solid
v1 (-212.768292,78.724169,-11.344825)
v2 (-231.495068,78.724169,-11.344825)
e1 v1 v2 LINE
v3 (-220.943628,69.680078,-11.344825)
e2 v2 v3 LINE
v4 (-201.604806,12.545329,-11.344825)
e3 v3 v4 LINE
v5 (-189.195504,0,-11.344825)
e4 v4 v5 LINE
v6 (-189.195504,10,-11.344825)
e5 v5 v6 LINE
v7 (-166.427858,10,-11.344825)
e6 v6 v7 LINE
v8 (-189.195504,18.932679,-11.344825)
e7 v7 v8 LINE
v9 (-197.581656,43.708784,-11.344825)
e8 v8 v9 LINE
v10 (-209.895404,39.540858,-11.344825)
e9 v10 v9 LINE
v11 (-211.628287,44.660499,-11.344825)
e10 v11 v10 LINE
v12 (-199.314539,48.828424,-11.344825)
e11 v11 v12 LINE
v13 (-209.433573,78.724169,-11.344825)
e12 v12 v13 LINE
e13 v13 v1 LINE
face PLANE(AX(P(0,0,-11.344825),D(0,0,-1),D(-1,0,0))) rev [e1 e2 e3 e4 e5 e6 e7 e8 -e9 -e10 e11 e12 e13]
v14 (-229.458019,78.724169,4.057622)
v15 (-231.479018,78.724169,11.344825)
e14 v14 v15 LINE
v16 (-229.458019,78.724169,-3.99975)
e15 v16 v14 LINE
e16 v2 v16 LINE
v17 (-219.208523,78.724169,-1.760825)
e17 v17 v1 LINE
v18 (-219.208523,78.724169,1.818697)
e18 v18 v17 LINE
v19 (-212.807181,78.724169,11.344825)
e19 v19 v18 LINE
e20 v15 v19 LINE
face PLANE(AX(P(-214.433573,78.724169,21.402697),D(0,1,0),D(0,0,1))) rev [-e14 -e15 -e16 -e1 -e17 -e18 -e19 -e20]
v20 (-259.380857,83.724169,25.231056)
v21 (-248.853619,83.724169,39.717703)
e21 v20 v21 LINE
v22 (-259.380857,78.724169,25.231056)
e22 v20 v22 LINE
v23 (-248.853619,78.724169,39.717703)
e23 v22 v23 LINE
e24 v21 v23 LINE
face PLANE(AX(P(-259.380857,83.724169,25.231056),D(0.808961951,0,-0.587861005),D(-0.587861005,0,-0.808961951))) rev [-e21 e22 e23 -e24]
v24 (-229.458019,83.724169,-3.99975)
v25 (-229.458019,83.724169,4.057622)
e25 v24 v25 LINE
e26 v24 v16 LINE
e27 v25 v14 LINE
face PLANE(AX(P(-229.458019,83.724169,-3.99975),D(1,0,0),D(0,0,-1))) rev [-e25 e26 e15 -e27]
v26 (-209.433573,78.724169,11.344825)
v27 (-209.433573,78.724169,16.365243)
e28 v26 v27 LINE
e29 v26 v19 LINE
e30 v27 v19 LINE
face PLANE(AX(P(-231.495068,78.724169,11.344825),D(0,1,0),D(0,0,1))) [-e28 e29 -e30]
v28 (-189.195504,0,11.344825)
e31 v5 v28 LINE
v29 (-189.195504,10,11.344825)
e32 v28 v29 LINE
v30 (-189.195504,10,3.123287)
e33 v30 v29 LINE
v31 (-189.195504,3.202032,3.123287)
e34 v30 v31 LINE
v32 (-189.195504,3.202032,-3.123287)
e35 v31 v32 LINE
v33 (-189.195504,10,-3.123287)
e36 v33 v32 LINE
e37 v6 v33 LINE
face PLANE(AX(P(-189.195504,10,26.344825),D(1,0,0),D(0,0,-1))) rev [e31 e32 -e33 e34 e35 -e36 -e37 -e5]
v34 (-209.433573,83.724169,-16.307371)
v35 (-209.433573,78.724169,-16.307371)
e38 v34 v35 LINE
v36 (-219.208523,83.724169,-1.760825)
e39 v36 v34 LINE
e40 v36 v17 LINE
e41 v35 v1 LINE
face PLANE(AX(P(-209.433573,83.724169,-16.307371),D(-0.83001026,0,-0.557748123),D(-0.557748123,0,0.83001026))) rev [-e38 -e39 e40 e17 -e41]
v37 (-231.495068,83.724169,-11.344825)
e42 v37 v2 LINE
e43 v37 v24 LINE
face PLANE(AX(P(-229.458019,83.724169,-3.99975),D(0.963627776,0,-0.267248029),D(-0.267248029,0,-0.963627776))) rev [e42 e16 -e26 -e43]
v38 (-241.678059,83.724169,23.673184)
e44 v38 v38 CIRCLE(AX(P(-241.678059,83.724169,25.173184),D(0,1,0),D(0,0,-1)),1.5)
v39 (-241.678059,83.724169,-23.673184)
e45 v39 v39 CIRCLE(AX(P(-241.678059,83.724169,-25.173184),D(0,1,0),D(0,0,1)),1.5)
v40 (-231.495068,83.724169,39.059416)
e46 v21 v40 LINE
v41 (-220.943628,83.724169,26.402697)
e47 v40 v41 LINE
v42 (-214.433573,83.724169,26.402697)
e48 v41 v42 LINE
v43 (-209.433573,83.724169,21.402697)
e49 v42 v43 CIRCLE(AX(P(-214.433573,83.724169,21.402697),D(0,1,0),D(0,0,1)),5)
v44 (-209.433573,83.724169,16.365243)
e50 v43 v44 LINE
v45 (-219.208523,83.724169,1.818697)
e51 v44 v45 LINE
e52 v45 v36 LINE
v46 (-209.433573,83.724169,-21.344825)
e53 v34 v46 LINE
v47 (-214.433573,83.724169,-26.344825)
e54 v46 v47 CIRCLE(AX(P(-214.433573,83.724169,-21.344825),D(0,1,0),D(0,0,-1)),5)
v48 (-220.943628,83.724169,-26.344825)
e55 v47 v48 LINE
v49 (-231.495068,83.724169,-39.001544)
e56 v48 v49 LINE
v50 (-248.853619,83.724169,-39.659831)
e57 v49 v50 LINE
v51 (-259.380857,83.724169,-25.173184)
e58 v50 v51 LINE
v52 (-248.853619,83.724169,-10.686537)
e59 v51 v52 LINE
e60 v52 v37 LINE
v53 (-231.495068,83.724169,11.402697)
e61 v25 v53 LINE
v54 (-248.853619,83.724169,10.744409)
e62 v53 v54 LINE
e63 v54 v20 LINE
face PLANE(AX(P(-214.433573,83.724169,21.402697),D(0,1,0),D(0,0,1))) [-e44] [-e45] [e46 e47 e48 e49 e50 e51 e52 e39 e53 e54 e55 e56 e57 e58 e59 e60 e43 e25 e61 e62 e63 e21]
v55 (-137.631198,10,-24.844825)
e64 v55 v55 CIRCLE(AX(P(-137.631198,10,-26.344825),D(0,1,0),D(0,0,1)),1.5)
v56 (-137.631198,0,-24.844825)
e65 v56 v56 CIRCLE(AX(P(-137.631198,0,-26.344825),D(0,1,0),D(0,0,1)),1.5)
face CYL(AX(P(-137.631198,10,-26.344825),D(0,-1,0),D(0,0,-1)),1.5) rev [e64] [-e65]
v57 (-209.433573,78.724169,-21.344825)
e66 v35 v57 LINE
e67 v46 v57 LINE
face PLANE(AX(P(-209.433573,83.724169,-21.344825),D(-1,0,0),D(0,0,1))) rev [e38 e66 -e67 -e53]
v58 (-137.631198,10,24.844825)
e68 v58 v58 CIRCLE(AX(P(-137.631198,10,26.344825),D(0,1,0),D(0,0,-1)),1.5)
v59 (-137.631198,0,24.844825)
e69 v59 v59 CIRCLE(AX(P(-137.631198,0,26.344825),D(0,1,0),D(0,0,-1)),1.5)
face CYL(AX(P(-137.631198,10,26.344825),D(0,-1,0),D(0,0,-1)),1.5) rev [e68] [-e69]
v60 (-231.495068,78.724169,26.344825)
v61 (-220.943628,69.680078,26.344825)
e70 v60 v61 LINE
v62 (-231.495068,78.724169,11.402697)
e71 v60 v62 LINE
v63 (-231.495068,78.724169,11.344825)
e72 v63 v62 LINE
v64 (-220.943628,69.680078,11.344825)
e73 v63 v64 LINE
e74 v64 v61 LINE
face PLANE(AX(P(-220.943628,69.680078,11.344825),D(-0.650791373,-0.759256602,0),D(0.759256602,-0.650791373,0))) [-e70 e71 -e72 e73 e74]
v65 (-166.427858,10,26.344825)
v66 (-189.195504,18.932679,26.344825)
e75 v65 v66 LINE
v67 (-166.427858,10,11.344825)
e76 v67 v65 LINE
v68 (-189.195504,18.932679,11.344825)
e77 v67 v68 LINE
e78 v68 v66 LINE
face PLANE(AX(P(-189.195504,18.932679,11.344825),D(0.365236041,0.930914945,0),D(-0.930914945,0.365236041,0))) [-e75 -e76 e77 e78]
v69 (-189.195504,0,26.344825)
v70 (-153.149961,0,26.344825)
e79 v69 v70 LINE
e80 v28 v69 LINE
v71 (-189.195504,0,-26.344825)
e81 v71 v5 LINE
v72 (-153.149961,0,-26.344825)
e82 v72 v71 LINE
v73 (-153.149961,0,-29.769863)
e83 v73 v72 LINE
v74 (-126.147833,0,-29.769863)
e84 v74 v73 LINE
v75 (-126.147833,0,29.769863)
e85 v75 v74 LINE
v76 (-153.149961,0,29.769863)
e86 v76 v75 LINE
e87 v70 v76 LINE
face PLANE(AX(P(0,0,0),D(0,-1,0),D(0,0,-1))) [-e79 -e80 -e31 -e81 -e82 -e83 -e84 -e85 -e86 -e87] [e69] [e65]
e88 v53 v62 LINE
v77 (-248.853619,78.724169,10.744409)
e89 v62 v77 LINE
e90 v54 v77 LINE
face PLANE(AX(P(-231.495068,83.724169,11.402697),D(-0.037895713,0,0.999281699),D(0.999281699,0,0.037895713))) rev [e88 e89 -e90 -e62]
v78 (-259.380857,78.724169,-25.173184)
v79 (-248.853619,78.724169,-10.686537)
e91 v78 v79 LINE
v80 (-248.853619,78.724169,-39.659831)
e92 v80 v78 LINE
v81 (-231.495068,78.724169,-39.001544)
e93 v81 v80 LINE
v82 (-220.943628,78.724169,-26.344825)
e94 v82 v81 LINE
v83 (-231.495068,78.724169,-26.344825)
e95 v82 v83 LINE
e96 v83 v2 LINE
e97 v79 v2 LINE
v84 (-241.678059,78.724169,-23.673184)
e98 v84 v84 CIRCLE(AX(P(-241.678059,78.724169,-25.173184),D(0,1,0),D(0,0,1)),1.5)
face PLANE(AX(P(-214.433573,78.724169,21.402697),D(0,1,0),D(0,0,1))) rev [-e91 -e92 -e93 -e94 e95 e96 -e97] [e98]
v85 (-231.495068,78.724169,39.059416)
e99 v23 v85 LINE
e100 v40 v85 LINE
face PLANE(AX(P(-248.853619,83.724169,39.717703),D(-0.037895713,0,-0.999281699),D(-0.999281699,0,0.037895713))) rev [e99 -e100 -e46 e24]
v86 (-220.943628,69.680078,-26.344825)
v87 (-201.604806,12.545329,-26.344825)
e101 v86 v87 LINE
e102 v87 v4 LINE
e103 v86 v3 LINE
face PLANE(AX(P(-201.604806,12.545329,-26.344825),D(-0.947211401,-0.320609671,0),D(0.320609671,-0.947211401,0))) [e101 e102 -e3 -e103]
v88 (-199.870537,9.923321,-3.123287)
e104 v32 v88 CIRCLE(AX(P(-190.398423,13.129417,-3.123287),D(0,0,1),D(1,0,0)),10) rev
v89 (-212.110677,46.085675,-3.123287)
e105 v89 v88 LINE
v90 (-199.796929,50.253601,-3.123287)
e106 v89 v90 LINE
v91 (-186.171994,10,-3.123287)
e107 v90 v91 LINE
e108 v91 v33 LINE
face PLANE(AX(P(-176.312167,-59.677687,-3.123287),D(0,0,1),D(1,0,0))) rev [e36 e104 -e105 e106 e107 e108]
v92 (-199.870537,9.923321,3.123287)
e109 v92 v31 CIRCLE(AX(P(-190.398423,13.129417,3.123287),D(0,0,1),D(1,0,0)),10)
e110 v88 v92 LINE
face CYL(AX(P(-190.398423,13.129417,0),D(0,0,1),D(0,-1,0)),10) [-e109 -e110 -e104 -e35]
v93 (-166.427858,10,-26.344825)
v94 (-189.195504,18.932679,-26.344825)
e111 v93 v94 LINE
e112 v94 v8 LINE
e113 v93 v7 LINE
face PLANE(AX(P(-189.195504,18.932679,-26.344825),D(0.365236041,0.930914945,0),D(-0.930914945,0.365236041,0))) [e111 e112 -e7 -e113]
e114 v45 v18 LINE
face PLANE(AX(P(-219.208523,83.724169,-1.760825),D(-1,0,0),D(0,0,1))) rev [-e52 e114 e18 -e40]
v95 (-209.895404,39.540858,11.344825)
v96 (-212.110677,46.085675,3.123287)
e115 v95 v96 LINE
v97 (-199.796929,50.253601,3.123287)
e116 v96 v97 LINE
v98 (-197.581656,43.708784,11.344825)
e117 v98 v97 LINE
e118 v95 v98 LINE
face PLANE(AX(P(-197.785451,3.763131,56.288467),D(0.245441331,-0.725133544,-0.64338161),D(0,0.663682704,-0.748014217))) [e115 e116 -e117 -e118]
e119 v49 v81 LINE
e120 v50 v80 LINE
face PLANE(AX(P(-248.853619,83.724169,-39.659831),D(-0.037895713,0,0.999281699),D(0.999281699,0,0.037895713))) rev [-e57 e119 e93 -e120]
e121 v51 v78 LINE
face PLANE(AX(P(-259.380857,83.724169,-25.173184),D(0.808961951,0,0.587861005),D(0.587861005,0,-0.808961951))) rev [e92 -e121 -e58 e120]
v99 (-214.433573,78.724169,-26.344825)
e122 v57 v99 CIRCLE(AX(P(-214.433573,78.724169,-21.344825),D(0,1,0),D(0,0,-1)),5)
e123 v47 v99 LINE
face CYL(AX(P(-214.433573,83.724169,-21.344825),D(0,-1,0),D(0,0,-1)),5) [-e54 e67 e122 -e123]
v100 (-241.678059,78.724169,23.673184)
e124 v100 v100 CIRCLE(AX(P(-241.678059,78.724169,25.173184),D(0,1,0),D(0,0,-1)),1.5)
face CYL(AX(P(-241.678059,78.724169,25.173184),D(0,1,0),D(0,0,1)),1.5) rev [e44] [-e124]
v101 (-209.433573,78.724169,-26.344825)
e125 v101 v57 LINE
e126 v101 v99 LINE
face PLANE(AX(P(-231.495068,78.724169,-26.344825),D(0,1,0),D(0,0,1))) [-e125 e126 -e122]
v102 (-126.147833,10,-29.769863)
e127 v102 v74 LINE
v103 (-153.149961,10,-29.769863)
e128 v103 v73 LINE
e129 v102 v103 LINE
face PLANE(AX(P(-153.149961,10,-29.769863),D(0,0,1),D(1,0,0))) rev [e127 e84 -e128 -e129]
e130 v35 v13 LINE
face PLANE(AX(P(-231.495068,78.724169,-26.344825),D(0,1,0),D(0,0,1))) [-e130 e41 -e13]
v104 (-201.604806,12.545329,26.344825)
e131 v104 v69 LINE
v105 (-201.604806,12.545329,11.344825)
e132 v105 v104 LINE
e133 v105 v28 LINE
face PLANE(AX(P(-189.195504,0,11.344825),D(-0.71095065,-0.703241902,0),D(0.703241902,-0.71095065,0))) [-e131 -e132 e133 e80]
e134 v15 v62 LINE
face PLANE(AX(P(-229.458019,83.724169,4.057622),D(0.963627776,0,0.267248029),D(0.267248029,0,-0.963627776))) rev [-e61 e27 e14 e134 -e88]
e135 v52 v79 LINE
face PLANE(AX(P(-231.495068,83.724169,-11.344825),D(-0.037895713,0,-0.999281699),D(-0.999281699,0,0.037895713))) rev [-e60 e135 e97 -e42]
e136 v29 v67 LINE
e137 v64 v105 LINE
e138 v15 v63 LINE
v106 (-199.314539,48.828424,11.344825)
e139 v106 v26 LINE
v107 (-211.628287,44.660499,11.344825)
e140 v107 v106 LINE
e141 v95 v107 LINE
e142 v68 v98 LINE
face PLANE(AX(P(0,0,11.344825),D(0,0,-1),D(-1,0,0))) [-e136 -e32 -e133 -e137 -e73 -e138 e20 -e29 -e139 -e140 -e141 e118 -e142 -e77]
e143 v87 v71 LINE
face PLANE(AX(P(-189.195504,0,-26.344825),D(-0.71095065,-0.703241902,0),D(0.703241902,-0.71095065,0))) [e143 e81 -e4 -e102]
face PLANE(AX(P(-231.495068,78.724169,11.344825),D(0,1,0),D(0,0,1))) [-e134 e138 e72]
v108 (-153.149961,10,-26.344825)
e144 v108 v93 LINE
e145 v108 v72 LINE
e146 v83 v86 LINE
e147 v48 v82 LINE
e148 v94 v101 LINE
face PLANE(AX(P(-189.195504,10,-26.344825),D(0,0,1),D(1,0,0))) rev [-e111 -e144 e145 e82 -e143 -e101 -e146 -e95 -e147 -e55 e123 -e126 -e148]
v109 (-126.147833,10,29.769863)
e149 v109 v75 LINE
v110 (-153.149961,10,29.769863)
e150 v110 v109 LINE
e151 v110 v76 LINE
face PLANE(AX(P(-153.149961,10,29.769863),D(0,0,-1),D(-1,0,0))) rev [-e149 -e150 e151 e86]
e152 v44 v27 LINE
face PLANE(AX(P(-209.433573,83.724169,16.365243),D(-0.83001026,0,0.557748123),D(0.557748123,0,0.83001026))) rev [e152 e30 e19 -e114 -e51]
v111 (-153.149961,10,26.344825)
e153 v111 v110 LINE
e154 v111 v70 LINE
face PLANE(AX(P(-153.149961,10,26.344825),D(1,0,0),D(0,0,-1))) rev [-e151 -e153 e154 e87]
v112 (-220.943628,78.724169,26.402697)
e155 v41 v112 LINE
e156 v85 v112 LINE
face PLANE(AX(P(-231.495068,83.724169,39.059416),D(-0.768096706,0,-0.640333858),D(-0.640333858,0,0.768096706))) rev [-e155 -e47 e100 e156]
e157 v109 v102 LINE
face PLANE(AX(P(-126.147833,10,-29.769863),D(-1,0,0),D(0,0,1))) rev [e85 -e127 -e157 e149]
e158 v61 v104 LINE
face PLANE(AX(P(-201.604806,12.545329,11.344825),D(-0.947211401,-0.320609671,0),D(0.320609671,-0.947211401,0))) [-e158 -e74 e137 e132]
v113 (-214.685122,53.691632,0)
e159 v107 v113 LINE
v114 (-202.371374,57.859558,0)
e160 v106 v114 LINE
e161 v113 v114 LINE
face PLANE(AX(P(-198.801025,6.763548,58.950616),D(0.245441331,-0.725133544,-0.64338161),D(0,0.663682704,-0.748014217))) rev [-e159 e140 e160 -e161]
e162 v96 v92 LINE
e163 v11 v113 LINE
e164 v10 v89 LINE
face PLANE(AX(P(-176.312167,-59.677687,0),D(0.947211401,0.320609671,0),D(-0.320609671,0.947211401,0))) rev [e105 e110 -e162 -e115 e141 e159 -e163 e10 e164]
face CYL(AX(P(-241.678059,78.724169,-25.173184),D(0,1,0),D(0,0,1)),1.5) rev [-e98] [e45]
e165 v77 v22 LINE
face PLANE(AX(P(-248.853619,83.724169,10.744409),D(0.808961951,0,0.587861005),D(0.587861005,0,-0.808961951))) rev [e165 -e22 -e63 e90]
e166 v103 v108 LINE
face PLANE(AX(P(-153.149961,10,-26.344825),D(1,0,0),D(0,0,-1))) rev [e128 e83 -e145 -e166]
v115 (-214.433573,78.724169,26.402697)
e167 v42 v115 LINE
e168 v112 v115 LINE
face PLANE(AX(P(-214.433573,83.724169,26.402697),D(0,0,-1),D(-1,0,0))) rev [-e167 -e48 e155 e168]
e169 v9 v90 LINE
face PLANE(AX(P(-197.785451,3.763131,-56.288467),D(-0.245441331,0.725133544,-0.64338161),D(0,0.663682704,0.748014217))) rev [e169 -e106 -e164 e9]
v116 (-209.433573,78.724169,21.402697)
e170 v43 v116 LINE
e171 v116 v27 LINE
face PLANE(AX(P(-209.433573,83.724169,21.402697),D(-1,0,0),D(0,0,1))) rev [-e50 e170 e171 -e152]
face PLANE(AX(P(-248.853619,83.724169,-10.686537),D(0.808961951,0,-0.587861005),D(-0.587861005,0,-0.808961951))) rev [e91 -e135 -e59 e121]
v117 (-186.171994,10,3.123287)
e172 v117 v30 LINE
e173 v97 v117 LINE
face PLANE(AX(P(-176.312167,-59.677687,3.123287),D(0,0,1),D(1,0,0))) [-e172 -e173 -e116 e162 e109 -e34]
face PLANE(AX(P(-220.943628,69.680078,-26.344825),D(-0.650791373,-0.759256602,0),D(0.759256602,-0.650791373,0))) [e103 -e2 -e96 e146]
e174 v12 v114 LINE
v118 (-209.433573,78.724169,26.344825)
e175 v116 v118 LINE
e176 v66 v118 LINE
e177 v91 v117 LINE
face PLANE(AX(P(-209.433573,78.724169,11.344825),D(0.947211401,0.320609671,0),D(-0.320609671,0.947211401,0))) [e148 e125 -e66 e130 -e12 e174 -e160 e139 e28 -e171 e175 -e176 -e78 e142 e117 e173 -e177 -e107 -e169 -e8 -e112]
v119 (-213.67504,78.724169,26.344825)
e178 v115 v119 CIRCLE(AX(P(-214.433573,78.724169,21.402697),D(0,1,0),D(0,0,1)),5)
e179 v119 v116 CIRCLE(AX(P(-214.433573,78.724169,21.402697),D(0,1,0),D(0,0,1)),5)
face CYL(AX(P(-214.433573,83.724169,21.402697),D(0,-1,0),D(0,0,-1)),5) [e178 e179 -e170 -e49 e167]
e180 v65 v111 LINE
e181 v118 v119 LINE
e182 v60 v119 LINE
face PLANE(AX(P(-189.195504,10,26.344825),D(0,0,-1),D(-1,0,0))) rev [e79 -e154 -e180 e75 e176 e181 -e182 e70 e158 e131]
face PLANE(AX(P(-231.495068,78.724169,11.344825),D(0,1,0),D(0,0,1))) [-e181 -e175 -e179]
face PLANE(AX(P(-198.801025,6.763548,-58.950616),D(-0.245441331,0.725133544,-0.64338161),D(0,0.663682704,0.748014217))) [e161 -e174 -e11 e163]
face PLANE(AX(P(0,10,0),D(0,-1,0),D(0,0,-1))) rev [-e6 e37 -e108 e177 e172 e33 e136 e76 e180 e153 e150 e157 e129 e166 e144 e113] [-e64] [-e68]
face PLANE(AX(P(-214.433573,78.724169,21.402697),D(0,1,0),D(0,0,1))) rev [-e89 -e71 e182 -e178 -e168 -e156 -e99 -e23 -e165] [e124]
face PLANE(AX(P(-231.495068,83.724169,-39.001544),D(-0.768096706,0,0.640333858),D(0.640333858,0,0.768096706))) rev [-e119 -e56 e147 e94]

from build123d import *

# Parameters (mm, degrees)
CROQUIS1_R              = 1.5
SALIENTE_EXTRUIR1_DEPTH = 10
SALIENTE_EXTRUIR2_DEPTH = 15
MATRIZL1_COUNT          = 2
MATRIZL1_PITCH          = 37.68964915
SALIENTE_EXTRUIR3_DEPTH = 13
SALIENTE_EXTRUIR7_DEPTH = 5
REDONDEO2_R             = 10
CROQUIS11_R             = 1.5
CORTAR_EXTRUIR2_DEPTH   = 5


with BuildPart() as part:
    # Croquis1 → Saliente-Extruir1 (new body)
    with BuildSketch(Plane(origin=(0, 0, 0), x_dir=(1, 0, 0), z_dir=(0, 1, 0))):
        Polygon((-189.195504205, 26.344824576), (-153.149960772, 26.344824576), (-153.149960772, 29.769862991), (-126.147833027, 29.769862991), (-126.147833027, -29.769862991), (-153.149960772, -29.769862991), (-153.149960772, -26.344824576), (-189.195504205, -26.344824576), align=None)
        with Locations(Location((-137.631197841, 26.344824576, 0), (0, 0, 270))):
            Circle(CROQUIS1_R, mode=Mode.SUBTRACT)
        with Locations(Location((-137.631197841, -26.344824576, 0), (0, 0, 90))):
            Circle(CROQUIS1_R, mode=Mode.SUBTRACT)
    extrude(amount=SALIENTE_EXTRUIR1_DEPTH)

    # Croquis3 → Saliente-Extruir2 (add)
    with BuildSketch(Plane.XY.offset(26.344824576)):
        Polygon((-189.195504205, 0), (-201.604805992, 12.545329197), (-220.943628409, 69.680078214), (-231.495067756, 78.724169083), (-209.43357333, 78.724169083), (-189.195504205, 18.932679451), (-166.427858451, 10), (-166.427858451, 0), align=None)
    saliente_extruir2 = extrude(amount=-SALIENTE_EXTRUIR2_DEPTH)

    # MatrizL1: Saliente-Extruir2 ×2
    with Locations(*[(0, 0, -i * MATRIZL1_PITCH) for i in range(1, MATRIZL1_COUNT)]):
        add(saliente_extruir2)

    # Croquis8 → Saliente-Extruir3 (add)
    with BuildSketch(Plane(origin=(-163.998418841, -55.509761627, 0), x_dir=(0, 0, -1), z_dir=(0.9472114013741786, 0.3206096709501519, 0))):
        Polygon((-11.344824576, 110.153008866), (-11.344824576, 104.748047896), (-3.12328674, 111.657611587), (-3.12328674, 63.690909236), (3.123286737, 63.690909236), (3.123286737, 111.657611587), (11.344824574, 104.748047896), (11.344824574, 110.153008866), (-1e-09, 119.687452364), align=None)
    extrude(amount=-SALIENTE_EXTRUIR3_DEPTH)

    # Croquis10 → Saliente-Extruir7 (add)
    with BuildSketch(Plane(origin=(0, 78.724169083, 0), x_dir=(1, 0, 0), z_dir=(0, 1, 0))):
        with BuildLine():
            Line((-214.43357333, 26.344824574), (-220.943628409, 26.344824574))
            Line((-220.943628409, 26.344824574), (-231.495067756, 39.001543724))
            Line((-231.495067756, 39.001543724), (-248.853619127, 39.65983126))
            Line((-248.853619127, 39.65983126), (-259.380857056, 25.173184149))
            Line((-259.380857056, 25.173184149), (-248.853619127, 10.686537038))
            Line((-248.853619127, 10.686537038), (-231.495067756, 11.344824574))
            Line((-231.495067756, 11.344824574), (-229.458019065, 3.999750012))
            Line((-229.458019065, 3.999750012), (-229.458019065, -4.057622202))
            Line((-229.458019065, -4.057622202), (-231.495067756, -11.402696763))
            Line((-231.495067756, -11.402696763), (-248.853619127, -10.744409227))
            Line((-248.853619127, -10.744409227), (-259.380857056, -25.231056338))
            Line((-259.380857056, -25.231056338), (-248.853619127, -39.71770345))
            Line((-248.853619127, -39.71770345), (-231.495067756, -39.059415914))
            Line((-231.495067756, -39.059415914), (-220.943628409, -26.402696763))
            Line((-220.943628409, -26.402696763), (-214.43357333, -26.402696763))
            ThreePointArc((-214.43357333, -26.402696763), (-210.898039424, -24.938230669), (-209.43357333, -21.402696763))
            Line((-209.43357333, -21.402696763), (-209.43357333, -16.36524325))
            Line((-209.43357333, -16.36524325), (-219.208523363, -1.818697081))
            Line((-219.208523363, -1.818697081), (-219.208523363, 1.760824892))
            Line((-219.208523363, 1.760824892), (-209.43357333, 16.30737106))
            Line((-209.43357333, 16.30737106), (-209.43357333, 21.344824574))
            ThreePointArc((-209.43357333, 21.344824574), (-210.898039424, 24.880358479), (-214.43357333, 26.344824574))
        make_face()
    extrude(amount=SALIENTE_EXTRUIR7_DEPTH)

    # Redondeo2
    # the kernel refuses this fillet: 10 mm, written as the material it takes off along each edge
    with BuildSketch(Plane(origin=(-196.732088511, 0.651068043, 27.595787298), x_dir=(-0.3206096709501526, 0.9472114013741784, 0), z_dir=(0, 0, -1))) as redondeo2_piece_1_section:
        with BuildLine():
            CenterArc((9.789000223, 10), REDONDEO2_R, 191.790853222, 78.209146778)
            Line((0, 7.956602185), (0, 0))
            Line((0, 0), (9.789000223, 0))
        make_face()
    redondeo2_piece_1 = extrude(amount=30.719074034, mode=Mode.PRIVATE)
    redondeo2_piece_1 = split(redondeo2_piece_1, bisect_by=Plane(origin=(-197.071889221, 5.655111801, 11.344824576), z_dir=(0, 0, -1)), keep=Keep.TOP, mode=Mode.PRIVATE)
    add(redondeo2_piece_1, mode=Mode.SUBTRACT)

    # Croquis11 → Cortar-Extruir2 (cut)
    with BuildSketch(Plane(origin=(0, 83.724169083, 0), x_dir=(1, 0, 0), z_dir=(0, 1, 0))):
        with Locations(Location((-241.678058983, 25.173184149, 0), (0, 0, 270))):
            Circle(CROQUIS11_R)
        with Locations(Location((-241.678058983, -25.173184149, 0), (0, 0, 90))):
            Circle(CROQUIS11_R)
    extrude(amount=-CORTAR_EXTRUIR2_DEPTH, mode=Mode.SUBTRACT)


solid = part.part
